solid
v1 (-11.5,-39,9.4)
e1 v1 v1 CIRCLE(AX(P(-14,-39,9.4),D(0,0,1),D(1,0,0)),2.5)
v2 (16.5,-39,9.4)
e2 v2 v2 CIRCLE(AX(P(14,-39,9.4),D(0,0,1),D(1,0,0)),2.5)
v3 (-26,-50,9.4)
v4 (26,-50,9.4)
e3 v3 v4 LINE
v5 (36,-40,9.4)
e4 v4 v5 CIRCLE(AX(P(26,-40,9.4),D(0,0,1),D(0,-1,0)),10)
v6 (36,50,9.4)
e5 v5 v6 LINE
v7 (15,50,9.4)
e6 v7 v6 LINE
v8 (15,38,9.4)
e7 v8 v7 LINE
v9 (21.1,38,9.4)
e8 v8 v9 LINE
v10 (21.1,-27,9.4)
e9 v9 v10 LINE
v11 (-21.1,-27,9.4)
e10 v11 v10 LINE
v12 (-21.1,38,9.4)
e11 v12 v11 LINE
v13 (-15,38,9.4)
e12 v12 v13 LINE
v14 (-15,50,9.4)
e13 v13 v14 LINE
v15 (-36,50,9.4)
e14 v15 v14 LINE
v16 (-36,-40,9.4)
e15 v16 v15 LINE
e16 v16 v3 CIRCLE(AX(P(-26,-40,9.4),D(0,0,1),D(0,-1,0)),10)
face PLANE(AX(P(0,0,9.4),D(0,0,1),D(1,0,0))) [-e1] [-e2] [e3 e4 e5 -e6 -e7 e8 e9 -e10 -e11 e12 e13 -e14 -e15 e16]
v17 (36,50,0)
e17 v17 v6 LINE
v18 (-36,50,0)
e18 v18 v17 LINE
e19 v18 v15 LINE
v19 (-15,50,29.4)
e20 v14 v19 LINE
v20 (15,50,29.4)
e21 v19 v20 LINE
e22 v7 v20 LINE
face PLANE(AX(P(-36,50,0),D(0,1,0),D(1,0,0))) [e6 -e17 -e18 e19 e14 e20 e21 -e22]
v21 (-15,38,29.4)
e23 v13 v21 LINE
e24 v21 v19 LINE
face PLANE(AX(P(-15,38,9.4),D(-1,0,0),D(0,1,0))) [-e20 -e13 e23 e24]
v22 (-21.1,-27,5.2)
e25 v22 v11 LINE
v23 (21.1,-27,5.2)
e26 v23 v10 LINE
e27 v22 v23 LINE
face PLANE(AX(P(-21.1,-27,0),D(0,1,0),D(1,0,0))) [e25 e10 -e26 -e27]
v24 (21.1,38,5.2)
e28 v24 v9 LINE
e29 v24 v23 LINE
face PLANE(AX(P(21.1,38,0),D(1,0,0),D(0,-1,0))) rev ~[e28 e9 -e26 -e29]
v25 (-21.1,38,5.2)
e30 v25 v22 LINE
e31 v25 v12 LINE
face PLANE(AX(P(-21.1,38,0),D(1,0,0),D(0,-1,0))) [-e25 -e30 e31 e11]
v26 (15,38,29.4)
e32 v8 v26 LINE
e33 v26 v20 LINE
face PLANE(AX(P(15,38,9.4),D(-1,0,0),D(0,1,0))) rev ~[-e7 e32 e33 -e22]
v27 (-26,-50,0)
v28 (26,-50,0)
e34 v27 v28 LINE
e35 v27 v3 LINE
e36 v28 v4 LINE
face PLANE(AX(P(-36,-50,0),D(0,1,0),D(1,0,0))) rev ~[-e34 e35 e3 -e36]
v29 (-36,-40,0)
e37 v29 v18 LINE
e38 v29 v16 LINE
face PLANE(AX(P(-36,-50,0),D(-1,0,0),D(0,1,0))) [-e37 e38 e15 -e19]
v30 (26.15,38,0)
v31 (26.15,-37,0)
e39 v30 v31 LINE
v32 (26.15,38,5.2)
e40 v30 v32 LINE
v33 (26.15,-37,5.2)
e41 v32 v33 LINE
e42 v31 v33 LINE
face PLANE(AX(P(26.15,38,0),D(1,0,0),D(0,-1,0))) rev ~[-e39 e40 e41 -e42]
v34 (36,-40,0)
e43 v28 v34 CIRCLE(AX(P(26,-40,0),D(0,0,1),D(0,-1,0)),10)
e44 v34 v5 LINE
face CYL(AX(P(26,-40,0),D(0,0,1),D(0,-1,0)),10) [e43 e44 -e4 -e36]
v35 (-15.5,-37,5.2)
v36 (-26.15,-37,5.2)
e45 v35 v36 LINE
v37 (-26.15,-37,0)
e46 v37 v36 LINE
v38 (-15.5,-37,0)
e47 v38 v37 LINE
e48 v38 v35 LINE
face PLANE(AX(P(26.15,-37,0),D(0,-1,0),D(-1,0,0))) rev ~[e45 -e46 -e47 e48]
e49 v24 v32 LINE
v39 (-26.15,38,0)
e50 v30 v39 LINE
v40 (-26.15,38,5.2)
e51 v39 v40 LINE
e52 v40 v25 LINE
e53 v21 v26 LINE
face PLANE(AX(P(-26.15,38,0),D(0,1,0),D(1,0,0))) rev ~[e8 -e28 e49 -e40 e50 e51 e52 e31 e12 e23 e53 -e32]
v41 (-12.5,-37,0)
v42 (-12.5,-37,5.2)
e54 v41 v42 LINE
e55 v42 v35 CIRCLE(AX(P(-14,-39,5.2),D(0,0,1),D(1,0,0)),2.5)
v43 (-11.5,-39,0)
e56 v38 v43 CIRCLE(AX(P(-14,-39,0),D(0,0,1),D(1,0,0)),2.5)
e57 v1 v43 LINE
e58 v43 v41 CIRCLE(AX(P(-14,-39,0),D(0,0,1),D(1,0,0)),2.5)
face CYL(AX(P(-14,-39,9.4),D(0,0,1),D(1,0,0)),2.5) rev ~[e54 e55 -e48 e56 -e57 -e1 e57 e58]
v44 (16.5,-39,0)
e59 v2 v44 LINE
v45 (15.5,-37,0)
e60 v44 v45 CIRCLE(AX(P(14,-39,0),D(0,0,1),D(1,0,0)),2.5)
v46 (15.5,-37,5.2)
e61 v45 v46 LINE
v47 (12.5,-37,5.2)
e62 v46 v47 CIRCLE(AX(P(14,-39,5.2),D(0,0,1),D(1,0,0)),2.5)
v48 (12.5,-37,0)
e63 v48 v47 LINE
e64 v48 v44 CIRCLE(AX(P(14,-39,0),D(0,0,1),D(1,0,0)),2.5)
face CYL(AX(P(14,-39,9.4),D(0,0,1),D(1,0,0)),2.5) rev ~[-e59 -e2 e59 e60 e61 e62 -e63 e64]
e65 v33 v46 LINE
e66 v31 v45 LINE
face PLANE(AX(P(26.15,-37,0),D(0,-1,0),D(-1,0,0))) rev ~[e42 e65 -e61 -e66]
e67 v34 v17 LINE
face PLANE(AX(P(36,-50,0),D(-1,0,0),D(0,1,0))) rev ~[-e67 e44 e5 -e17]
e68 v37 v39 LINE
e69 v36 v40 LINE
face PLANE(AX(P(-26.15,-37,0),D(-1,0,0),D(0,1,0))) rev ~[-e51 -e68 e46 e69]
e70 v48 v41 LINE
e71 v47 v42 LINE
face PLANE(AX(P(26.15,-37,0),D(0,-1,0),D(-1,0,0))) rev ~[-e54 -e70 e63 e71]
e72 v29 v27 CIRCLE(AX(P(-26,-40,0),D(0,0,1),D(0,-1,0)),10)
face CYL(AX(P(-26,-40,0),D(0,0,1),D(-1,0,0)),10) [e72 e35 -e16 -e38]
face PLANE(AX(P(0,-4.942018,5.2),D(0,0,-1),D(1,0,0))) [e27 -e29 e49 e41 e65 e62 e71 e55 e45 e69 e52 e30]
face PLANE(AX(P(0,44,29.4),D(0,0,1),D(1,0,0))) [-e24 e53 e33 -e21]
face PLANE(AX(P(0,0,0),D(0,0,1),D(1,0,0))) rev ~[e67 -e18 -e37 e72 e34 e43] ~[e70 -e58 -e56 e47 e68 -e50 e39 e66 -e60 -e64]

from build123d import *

# Parameters (mm, degrees)
F0_W     = 72
F0_H     = 100
F1_DEPTH = 9.4
F2_W     = 42.2
F2_H     = 65
F3_DEPTH = 5.2
F4_DEPTH = 9.4
F5_W     = 30
F5_H     = 12
F6_DEPTH = 20
F7_R     = 2.5
F8_DEPTH = 9.4
F9_R     = 10


# Not quite as in the source:
# - a feature names something its author has since deleted; it is built from what else it names


with BuildPart() as f1:
    # F0 (on Top) → F1 (new body)
    with BuildSketch(Plane.XY):
        Rectangle(F0_W, F0_H)
    extrude(amount=F1_DEPTH)

    # F2 (on face) → F3 (cut)
    with BuildSketch(Plane(origin=(0, 0, 0), x_dir=(1, 0, 0), z_dir=(0, 0, -1))):
        Polygon((21.1, -38), (26.15, -38), (26.15, 37), (-26.15, 37), (-26.15, -38), (-21.1, -38), (-21.1, 27), (21.1, 27), align=None)
        with Locations((0, -5.5)):
            Rectangle(F2_W, F2_H)
    extrude(amount=-F3_DEPTH, mode=Mode.SUBTRACT)

    # F2 (on face) → F4 (cut, through all)
    with BuildSketch(Plane(origin=(0, 0, 0), x_dir=(1, 0, 0), z_dir=(0, 0, -1))):
        with Locations((0, -5.5)):
            Rectangle(F2_W, F2_H)
    extrude(amount=-F4_DEPTH, mode=Mode.SUBTRACT)

    # F5 (on face) → F6 (join)
    with BuildSketch(Plane.XY.offset(9.4)):
        with Locations((0, 44)):
            Rectangle(F5_W, F5_H)
    extrude(amount=F6_DEPTH)

    # F7 (on face) → F8 (cut, through all)
    with BuildSketch(Plane.XY.offset(9.4)):
        with Locations((-14, -39)):
            Circle(F7_R)
        with Locations((14, -39)):
            Circle(F7_R)
    extrude(amount=-F8_DEPTH, mode=Mode.SUBTRACT)

    # F9
    f9_edges = [f1.edges().sort_by_distance(p)[0] for p in [
        (36, -50, 4.7),
        (-36, -50, 4.7),
    ]]
    fillet(f9_edges, radius=F9_R)


solid = f1.part
